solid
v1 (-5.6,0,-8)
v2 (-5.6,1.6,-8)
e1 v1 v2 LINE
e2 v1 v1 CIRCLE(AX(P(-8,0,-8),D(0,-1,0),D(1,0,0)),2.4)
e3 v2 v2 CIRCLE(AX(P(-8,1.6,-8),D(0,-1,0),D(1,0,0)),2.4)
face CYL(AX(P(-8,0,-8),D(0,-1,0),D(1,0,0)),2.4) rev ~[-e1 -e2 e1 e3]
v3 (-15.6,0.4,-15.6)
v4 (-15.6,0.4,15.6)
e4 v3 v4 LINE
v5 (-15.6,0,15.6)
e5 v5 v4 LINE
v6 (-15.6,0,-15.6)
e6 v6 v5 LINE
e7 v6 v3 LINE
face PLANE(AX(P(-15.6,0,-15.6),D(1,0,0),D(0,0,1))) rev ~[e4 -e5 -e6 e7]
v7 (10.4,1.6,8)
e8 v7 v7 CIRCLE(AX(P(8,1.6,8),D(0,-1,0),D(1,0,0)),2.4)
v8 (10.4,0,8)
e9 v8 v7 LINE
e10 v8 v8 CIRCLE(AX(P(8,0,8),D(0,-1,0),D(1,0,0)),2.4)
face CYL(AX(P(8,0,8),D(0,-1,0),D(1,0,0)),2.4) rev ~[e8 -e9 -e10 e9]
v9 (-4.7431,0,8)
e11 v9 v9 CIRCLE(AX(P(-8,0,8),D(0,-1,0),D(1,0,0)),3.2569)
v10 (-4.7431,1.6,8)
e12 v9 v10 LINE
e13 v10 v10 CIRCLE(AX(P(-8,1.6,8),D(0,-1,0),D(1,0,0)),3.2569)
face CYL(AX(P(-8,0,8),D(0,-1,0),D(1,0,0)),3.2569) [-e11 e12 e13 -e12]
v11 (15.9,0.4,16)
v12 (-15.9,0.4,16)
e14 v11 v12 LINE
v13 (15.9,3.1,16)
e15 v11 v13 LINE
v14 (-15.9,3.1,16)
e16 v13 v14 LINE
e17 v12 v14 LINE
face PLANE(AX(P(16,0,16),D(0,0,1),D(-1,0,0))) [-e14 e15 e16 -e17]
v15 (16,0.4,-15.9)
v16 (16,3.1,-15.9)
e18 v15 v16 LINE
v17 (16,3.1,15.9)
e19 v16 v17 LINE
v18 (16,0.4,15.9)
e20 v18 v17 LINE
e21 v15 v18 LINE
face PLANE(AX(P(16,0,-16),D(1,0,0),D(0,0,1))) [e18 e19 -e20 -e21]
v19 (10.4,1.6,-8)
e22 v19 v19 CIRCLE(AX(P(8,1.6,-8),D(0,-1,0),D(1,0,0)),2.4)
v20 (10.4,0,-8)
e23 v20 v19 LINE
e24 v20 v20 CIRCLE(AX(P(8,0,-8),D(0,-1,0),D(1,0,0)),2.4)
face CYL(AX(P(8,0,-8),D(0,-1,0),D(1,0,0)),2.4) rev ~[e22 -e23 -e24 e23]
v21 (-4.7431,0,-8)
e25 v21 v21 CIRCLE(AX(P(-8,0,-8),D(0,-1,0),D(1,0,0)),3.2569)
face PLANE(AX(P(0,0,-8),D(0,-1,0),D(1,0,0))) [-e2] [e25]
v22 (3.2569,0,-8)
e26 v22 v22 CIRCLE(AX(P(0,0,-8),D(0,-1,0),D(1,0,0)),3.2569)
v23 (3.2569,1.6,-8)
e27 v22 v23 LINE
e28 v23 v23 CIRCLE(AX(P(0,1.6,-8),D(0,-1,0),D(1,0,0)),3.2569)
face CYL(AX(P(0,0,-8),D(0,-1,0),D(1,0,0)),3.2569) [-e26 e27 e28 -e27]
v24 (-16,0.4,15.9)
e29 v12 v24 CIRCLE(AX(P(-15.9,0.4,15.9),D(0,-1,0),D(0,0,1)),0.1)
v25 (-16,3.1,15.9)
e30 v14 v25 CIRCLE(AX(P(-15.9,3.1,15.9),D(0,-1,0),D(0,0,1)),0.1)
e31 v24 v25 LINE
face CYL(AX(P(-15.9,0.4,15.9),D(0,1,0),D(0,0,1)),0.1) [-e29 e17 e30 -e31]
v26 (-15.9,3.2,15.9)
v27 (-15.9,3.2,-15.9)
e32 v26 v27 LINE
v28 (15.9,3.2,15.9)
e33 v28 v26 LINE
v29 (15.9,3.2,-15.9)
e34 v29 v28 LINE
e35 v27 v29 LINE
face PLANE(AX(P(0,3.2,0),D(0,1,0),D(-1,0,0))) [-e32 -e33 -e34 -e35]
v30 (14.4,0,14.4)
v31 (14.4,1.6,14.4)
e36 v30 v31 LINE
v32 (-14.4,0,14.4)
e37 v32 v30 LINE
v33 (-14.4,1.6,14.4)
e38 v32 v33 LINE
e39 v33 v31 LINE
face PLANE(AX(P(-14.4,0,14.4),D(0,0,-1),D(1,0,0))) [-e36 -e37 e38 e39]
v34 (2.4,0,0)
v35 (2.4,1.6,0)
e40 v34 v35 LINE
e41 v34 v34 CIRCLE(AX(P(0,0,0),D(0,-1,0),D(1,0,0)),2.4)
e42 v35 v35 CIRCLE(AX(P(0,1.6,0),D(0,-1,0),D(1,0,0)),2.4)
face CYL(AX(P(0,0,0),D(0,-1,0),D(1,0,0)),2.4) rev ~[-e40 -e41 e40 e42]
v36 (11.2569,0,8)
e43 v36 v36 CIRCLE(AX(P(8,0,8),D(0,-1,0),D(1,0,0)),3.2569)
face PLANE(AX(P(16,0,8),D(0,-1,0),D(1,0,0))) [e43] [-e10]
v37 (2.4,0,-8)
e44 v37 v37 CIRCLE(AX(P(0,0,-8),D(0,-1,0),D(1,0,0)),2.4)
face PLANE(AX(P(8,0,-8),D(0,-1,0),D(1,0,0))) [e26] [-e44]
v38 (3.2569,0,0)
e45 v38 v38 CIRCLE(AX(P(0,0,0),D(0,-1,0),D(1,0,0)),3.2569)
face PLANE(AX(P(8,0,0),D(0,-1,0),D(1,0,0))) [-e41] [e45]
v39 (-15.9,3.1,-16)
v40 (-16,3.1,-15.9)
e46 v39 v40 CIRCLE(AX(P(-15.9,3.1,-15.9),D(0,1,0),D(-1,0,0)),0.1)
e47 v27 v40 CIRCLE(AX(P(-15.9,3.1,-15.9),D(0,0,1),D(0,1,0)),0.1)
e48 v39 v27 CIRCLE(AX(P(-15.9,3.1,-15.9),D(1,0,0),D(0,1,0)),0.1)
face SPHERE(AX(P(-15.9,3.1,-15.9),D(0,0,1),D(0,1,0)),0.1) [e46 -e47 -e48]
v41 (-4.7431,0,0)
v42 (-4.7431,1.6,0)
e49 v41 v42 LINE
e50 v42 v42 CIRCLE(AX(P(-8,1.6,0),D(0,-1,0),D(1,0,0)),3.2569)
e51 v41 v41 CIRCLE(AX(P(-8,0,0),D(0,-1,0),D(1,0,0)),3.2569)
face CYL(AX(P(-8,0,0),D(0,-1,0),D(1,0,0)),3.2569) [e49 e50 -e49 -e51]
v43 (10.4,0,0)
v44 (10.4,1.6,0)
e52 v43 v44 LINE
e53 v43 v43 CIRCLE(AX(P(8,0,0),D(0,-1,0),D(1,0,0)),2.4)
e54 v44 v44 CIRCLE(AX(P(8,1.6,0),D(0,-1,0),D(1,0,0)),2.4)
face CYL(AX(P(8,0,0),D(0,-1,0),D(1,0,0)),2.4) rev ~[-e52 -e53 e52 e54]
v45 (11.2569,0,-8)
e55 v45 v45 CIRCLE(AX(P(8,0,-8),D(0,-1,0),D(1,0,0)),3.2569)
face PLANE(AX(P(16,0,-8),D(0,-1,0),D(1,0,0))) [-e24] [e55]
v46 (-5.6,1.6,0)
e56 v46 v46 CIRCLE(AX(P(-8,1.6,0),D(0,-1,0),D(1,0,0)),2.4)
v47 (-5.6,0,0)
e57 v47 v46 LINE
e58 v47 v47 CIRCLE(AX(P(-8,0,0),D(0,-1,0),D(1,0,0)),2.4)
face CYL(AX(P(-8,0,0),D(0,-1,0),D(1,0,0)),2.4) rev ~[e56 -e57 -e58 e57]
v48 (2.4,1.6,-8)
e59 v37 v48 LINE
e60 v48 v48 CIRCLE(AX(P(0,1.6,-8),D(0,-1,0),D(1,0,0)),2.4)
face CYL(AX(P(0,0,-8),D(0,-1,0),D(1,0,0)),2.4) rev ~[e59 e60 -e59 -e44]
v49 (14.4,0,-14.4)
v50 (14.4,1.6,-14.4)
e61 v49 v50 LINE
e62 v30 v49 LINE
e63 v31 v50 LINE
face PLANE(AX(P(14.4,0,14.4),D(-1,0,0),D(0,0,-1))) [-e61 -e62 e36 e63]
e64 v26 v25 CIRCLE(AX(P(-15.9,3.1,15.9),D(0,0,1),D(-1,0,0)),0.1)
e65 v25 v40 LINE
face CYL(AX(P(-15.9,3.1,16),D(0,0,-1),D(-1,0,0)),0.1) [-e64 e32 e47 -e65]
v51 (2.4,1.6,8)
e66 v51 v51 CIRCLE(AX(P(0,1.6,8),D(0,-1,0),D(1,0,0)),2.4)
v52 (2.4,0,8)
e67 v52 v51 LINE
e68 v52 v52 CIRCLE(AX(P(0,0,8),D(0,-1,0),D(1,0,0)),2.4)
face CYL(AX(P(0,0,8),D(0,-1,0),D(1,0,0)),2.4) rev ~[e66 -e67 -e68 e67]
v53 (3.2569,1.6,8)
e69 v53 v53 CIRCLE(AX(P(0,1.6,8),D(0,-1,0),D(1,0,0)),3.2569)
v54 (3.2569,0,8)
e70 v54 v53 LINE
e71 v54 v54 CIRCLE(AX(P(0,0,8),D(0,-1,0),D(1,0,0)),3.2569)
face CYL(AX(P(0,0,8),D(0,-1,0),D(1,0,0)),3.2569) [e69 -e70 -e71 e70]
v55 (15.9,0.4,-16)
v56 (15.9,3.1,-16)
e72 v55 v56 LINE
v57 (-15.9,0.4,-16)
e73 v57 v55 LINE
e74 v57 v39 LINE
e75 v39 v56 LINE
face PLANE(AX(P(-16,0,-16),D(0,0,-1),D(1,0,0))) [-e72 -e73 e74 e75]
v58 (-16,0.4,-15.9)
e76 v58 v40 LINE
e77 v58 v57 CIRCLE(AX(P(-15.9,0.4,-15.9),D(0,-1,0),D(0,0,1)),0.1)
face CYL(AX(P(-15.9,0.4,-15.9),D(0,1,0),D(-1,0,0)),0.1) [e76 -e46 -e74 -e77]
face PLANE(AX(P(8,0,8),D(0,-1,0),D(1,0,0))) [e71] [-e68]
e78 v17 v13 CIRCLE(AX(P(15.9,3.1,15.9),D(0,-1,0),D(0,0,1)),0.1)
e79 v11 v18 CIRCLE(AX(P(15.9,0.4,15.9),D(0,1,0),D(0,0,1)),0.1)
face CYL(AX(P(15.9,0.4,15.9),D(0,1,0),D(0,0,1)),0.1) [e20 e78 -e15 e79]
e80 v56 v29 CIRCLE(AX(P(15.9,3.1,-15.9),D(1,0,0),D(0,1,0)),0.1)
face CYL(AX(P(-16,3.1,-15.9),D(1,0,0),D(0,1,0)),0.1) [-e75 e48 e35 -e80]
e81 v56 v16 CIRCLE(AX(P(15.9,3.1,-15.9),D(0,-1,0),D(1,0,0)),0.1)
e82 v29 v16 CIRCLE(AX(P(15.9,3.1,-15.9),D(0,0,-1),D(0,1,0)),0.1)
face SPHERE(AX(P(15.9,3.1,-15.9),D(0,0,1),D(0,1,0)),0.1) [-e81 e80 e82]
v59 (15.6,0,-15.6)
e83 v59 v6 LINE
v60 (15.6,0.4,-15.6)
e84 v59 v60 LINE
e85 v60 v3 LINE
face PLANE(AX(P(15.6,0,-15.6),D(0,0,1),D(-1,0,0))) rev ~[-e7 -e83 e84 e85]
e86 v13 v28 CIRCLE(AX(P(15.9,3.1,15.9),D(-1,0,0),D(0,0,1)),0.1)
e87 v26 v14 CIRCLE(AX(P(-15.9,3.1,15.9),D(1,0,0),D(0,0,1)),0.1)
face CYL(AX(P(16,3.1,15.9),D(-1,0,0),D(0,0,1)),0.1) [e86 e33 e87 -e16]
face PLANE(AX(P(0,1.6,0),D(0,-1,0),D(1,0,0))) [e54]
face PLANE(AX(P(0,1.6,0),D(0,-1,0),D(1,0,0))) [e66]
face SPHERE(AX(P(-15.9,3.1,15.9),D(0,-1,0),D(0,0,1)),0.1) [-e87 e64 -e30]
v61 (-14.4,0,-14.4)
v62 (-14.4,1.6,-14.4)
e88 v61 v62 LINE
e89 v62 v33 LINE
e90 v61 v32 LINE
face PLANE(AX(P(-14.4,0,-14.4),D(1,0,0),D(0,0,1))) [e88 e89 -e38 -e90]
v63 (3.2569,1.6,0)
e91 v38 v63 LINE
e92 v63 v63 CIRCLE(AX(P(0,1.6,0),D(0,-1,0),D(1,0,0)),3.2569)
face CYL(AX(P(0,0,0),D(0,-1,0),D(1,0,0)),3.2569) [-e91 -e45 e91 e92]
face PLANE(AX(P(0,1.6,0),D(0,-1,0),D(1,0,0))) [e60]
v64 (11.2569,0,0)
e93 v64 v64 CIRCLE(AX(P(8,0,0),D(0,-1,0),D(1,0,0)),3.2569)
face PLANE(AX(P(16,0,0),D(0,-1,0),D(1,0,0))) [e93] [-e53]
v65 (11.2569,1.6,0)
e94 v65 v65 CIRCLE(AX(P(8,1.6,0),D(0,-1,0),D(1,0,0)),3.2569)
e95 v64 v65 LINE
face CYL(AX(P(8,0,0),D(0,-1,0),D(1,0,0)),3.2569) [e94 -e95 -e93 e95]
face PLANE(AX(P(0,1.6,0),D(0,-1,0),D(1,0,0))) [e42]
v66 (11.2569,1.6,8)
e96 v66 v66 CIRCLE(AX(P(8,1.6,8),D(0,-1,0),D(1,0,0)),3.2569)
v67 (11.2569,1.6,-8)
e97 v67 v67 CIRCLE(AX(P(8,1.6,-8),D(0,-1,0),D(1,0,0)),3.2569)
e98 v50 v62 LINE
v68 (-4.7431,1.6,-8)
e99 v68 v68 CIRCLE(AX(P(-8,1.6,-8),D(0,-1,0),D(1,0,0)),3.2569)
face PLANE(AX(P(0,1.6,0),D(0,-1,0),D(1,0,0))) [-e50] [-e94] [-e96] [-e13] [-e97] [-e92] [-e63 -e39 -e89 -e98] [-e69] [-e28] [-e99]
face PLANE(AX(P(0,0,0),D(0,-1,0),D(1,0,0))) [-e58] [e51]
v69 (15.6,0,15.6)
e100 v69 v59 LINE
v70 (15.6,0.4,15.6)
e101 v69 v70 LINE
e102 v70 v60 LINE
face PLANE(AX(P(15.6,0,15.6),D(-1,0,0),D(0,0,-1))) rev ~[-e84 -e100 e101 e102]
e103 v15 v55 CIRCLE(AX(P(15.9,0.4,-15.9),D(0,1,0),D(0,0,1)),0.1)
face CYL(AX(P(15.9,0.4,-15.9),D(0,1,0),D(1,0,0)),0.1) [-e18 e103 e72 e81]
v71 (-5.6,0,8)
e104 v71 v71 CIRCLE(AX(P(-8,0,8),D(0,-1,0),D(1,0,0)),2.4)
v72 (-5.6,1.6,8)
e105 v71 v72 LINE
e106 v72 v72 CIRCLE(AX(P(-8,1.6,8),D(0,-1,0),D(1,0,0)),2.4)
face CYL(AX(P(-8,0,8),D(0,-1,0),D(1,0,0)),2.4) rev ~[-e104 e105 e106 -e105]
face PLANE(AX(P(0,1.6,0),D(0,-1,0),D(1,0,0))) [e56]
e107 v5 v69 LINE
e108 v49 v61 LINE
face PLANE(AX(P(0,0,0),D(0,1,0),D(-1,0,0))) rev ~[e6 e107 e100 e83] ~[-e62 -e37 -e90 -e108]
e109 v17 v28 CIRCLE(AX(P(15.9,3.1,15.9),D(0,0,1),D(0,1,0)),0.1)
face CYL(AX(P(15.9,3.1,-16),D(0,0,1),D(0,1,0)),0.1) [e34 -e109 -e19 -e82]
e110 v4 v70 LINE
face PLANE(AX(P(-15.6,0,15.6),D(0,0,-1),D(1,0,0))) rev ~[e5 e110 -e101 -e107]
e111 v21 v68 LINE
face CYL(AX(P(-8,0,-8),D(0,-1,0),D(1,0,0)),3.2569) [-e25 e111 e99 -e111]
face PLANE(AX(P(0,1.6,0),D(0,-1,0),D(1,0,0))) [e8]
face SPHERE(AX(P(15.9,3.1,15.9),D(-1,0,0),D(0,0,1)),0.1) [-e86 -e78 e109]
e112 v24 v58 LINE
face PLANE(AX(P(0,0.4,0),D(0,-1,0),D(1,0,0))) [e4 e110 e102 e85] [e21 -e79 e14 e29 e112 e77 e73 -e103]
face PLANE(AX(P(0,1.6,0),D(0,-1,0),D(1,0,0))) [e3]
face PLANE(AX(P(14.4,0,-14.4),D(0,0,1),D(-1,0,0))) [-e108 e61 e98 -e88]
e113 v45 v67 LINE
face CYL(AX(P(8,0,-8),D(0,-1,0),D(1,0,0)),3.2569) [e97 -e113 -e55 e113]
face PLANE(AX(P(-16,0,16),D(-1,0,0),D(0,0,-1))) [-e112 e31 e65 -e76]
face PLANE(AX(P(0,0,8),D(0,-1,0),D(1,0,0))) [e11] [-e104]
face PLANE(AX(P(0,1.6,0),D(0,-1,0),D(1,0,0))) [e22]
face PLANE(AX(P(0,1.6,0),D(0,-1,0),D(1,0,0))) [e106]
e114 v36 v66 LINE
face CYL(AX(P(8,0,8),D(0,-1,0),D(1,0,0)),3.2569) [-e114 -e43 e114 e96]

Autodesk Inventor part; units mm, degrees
ref_plane "YZ Plane" through (0, 0, 0) normal (1, 0, 0) x (0, 1, 0)
ref_plane "XZ Plane" through (0, 0, 0) normal (0, 1, 0) x (-1, 0, 0)
ref_plane "XY Plane" through (0, 0, 0) normal (0, 0, 1) x (1, 0, 0)
sketch "Sketch2" plane through (0, 0, 0) normal (0, 1, 0) x (-1, 0, 0)
  line L0 (-16, 16) -> (16, 16)
  line L1 (16, 16) -> (16, -16)
  line L2 (16, -16) -> (-16, -16)
  line L3 (-16, -16) -> (-16, 16)
  point P0 (0, 0)
  point P1 (0, 16)
  point P2 (-16, 0)
  dimension "d0" = 32
  dimension "d1" = 32
extrude "Extrusion1" add sketch "Sketch2" along normal blind 3.2
sketch "Sketch3" plane through (0, 0, 0) normal (0, -1, 0) x (1, 0, 0)
  line L0 (-16, 16) -> (-16, -16) projected
  line L1 (-14.4, 14.4) -> (14.4, 14.4)
  line L2 (14.4, 14.4) -> (14.4, -14.4)
  line L3 (14.4, -14.4) -> (-14.4, -14.4)
  line L4 (-14.4, -14.4) -> (-14.4, 14.4)
  circle A0 centre (-8, 0) radius 3.2569
  circle A1 centre (-8, 0) radius 2.4
  line L5 (-16, -16) -> (16, -16) projected
  circle A2 centre (0, 0) radius 1.6
  line L6 (16, -16) -> (16, 16) projected
  line L7 (-12, 0) -> (-4, 0) construction
  line L8 (-4, 0) -> (4, 0) construction
  line L9 (4, 0) -> (12, 0) construction
  circle A3 centre (-12, 12) radius 2.4 construction
  circle A4 centre (-12, -12) radius 2.4 construction
  circle A5 centre (12, -12) radius 2.4 construction
  circle A6 centre (12, 12) radius 2.4 construction
  line L10 (16, 16) -> (-16, 16) projected
  line L11 (-15.6, 15.6) -> (15.6, 15.6)
  line L12 (15.6, 15.6) -> (15.6, -15.6)
  line L13 (15.6, -15.6) -> (-15.6, -15.6)
  line L14 (-15.6, -15.6) -> (-15.6, 15.6)
  circle A7 centre (-12, 4) radius 2.4 construction
  point P0 (-14.4, 0)
  point P1 (0, 14.4)
  point P2 (0, 0)
  point P3 (0, 15.6)
  point P4 (-15.6, 0)
  dimension "d61" = 4.8
  dimension "d75" = 8
  dimension "d76" = 16
  dimension "d86" = 3.2
  dimension "d92" = 8
  dimension "d98" = 24
  dimension "d99" = 24
  dimension "d102" = 0.4
  dimension "d103" = 0.4
  dimension "d106" = 8
extrude "Extrusion2" cut sketch "Sketch3" against normal blind 1.6 contours L1 L2 L3 L4 | A0 | A1 | A2
extrude "Extrusion7" cut sketch "Sketch3" against normal blind 0.4 contours L10 L6 L5 L0
extrude "Extrusion6" add sketch "Sketch3" against normal up to next contours A0
pattern_linear "Rectangular Pattern3" count 3 spacing 8 along (1, 0, 0) count 3 spacing 8 along (0, 0, -1) of "Extrusion6" second direction both ways yes
fillet "Fillet1" radius 0.1 8 edges at (-16, 1.8, 16) (0, 3.2, 16) (-16, 3.2, 0) (16, 1.8, 16) (16, 3.2, 0) (0, 3.2, -16) (16, 1.8, -16) (-16, 1.8, -16)
sketch "Skizze10" plane through (0, 3.2, 0) normal (0, 1, 0) x (1, 0, 0)
  line L0 (-15.9, 15.9) -> (15.9, 15.9) projected
  line L1 (-16.3705, 16.4) -> (16.3705, 16.4) construction
  line L2 (16.3705, 16.4) -> (16.3705, -16.4) construction
  line L3 (16.3705, -16.4) -> (-16.3705, -16.4) construction
  line L4 (-16.3705, -16.4) -> (-16.3705, 16.4) construction
  point P0 (0, 0)
  point P1 (0, 16.4)
  point P2 (-16.3705, 0)
  dimension "d123" = 0.5
decal "Aufkleber1"
equation "\"d4\" = 0.333333 * lh"
equation "\"d61\" = kd"
equation "\"d75\" = lu"
equation "\"d76\" = 2 * d75"
equation "\"d86\" = pd"
equation "\"d92\" = lu"
equation "\"d98\" = d99"
equation "\"d99\" = 3 * d75"
equation "\"d102\" = gw"
equation "\"d103\" = gw"
equation "\"d106\" = lu"
equation "\"d11\" = 0.333333 * lh - topthk"
equation "\"d104\" = gh"
equation "\"d91\" = lu"
equation "\"d109\" = lu"
equation "\"d22\" = lf"
equation "\"lh\" = 9.6"
equation "\"kd\" = 4.8"
equation "\"lu\" = 8"
equation "\"pd\" = 3.2"
equation "\"gw\" = 0.4"
equation "\"topthk\" = 1.6"
equation "\"gh\" = 0.4"
equation "\"lf\" = 0.1"
properties part number "42146_1751_1" material "ABS Plastic"
